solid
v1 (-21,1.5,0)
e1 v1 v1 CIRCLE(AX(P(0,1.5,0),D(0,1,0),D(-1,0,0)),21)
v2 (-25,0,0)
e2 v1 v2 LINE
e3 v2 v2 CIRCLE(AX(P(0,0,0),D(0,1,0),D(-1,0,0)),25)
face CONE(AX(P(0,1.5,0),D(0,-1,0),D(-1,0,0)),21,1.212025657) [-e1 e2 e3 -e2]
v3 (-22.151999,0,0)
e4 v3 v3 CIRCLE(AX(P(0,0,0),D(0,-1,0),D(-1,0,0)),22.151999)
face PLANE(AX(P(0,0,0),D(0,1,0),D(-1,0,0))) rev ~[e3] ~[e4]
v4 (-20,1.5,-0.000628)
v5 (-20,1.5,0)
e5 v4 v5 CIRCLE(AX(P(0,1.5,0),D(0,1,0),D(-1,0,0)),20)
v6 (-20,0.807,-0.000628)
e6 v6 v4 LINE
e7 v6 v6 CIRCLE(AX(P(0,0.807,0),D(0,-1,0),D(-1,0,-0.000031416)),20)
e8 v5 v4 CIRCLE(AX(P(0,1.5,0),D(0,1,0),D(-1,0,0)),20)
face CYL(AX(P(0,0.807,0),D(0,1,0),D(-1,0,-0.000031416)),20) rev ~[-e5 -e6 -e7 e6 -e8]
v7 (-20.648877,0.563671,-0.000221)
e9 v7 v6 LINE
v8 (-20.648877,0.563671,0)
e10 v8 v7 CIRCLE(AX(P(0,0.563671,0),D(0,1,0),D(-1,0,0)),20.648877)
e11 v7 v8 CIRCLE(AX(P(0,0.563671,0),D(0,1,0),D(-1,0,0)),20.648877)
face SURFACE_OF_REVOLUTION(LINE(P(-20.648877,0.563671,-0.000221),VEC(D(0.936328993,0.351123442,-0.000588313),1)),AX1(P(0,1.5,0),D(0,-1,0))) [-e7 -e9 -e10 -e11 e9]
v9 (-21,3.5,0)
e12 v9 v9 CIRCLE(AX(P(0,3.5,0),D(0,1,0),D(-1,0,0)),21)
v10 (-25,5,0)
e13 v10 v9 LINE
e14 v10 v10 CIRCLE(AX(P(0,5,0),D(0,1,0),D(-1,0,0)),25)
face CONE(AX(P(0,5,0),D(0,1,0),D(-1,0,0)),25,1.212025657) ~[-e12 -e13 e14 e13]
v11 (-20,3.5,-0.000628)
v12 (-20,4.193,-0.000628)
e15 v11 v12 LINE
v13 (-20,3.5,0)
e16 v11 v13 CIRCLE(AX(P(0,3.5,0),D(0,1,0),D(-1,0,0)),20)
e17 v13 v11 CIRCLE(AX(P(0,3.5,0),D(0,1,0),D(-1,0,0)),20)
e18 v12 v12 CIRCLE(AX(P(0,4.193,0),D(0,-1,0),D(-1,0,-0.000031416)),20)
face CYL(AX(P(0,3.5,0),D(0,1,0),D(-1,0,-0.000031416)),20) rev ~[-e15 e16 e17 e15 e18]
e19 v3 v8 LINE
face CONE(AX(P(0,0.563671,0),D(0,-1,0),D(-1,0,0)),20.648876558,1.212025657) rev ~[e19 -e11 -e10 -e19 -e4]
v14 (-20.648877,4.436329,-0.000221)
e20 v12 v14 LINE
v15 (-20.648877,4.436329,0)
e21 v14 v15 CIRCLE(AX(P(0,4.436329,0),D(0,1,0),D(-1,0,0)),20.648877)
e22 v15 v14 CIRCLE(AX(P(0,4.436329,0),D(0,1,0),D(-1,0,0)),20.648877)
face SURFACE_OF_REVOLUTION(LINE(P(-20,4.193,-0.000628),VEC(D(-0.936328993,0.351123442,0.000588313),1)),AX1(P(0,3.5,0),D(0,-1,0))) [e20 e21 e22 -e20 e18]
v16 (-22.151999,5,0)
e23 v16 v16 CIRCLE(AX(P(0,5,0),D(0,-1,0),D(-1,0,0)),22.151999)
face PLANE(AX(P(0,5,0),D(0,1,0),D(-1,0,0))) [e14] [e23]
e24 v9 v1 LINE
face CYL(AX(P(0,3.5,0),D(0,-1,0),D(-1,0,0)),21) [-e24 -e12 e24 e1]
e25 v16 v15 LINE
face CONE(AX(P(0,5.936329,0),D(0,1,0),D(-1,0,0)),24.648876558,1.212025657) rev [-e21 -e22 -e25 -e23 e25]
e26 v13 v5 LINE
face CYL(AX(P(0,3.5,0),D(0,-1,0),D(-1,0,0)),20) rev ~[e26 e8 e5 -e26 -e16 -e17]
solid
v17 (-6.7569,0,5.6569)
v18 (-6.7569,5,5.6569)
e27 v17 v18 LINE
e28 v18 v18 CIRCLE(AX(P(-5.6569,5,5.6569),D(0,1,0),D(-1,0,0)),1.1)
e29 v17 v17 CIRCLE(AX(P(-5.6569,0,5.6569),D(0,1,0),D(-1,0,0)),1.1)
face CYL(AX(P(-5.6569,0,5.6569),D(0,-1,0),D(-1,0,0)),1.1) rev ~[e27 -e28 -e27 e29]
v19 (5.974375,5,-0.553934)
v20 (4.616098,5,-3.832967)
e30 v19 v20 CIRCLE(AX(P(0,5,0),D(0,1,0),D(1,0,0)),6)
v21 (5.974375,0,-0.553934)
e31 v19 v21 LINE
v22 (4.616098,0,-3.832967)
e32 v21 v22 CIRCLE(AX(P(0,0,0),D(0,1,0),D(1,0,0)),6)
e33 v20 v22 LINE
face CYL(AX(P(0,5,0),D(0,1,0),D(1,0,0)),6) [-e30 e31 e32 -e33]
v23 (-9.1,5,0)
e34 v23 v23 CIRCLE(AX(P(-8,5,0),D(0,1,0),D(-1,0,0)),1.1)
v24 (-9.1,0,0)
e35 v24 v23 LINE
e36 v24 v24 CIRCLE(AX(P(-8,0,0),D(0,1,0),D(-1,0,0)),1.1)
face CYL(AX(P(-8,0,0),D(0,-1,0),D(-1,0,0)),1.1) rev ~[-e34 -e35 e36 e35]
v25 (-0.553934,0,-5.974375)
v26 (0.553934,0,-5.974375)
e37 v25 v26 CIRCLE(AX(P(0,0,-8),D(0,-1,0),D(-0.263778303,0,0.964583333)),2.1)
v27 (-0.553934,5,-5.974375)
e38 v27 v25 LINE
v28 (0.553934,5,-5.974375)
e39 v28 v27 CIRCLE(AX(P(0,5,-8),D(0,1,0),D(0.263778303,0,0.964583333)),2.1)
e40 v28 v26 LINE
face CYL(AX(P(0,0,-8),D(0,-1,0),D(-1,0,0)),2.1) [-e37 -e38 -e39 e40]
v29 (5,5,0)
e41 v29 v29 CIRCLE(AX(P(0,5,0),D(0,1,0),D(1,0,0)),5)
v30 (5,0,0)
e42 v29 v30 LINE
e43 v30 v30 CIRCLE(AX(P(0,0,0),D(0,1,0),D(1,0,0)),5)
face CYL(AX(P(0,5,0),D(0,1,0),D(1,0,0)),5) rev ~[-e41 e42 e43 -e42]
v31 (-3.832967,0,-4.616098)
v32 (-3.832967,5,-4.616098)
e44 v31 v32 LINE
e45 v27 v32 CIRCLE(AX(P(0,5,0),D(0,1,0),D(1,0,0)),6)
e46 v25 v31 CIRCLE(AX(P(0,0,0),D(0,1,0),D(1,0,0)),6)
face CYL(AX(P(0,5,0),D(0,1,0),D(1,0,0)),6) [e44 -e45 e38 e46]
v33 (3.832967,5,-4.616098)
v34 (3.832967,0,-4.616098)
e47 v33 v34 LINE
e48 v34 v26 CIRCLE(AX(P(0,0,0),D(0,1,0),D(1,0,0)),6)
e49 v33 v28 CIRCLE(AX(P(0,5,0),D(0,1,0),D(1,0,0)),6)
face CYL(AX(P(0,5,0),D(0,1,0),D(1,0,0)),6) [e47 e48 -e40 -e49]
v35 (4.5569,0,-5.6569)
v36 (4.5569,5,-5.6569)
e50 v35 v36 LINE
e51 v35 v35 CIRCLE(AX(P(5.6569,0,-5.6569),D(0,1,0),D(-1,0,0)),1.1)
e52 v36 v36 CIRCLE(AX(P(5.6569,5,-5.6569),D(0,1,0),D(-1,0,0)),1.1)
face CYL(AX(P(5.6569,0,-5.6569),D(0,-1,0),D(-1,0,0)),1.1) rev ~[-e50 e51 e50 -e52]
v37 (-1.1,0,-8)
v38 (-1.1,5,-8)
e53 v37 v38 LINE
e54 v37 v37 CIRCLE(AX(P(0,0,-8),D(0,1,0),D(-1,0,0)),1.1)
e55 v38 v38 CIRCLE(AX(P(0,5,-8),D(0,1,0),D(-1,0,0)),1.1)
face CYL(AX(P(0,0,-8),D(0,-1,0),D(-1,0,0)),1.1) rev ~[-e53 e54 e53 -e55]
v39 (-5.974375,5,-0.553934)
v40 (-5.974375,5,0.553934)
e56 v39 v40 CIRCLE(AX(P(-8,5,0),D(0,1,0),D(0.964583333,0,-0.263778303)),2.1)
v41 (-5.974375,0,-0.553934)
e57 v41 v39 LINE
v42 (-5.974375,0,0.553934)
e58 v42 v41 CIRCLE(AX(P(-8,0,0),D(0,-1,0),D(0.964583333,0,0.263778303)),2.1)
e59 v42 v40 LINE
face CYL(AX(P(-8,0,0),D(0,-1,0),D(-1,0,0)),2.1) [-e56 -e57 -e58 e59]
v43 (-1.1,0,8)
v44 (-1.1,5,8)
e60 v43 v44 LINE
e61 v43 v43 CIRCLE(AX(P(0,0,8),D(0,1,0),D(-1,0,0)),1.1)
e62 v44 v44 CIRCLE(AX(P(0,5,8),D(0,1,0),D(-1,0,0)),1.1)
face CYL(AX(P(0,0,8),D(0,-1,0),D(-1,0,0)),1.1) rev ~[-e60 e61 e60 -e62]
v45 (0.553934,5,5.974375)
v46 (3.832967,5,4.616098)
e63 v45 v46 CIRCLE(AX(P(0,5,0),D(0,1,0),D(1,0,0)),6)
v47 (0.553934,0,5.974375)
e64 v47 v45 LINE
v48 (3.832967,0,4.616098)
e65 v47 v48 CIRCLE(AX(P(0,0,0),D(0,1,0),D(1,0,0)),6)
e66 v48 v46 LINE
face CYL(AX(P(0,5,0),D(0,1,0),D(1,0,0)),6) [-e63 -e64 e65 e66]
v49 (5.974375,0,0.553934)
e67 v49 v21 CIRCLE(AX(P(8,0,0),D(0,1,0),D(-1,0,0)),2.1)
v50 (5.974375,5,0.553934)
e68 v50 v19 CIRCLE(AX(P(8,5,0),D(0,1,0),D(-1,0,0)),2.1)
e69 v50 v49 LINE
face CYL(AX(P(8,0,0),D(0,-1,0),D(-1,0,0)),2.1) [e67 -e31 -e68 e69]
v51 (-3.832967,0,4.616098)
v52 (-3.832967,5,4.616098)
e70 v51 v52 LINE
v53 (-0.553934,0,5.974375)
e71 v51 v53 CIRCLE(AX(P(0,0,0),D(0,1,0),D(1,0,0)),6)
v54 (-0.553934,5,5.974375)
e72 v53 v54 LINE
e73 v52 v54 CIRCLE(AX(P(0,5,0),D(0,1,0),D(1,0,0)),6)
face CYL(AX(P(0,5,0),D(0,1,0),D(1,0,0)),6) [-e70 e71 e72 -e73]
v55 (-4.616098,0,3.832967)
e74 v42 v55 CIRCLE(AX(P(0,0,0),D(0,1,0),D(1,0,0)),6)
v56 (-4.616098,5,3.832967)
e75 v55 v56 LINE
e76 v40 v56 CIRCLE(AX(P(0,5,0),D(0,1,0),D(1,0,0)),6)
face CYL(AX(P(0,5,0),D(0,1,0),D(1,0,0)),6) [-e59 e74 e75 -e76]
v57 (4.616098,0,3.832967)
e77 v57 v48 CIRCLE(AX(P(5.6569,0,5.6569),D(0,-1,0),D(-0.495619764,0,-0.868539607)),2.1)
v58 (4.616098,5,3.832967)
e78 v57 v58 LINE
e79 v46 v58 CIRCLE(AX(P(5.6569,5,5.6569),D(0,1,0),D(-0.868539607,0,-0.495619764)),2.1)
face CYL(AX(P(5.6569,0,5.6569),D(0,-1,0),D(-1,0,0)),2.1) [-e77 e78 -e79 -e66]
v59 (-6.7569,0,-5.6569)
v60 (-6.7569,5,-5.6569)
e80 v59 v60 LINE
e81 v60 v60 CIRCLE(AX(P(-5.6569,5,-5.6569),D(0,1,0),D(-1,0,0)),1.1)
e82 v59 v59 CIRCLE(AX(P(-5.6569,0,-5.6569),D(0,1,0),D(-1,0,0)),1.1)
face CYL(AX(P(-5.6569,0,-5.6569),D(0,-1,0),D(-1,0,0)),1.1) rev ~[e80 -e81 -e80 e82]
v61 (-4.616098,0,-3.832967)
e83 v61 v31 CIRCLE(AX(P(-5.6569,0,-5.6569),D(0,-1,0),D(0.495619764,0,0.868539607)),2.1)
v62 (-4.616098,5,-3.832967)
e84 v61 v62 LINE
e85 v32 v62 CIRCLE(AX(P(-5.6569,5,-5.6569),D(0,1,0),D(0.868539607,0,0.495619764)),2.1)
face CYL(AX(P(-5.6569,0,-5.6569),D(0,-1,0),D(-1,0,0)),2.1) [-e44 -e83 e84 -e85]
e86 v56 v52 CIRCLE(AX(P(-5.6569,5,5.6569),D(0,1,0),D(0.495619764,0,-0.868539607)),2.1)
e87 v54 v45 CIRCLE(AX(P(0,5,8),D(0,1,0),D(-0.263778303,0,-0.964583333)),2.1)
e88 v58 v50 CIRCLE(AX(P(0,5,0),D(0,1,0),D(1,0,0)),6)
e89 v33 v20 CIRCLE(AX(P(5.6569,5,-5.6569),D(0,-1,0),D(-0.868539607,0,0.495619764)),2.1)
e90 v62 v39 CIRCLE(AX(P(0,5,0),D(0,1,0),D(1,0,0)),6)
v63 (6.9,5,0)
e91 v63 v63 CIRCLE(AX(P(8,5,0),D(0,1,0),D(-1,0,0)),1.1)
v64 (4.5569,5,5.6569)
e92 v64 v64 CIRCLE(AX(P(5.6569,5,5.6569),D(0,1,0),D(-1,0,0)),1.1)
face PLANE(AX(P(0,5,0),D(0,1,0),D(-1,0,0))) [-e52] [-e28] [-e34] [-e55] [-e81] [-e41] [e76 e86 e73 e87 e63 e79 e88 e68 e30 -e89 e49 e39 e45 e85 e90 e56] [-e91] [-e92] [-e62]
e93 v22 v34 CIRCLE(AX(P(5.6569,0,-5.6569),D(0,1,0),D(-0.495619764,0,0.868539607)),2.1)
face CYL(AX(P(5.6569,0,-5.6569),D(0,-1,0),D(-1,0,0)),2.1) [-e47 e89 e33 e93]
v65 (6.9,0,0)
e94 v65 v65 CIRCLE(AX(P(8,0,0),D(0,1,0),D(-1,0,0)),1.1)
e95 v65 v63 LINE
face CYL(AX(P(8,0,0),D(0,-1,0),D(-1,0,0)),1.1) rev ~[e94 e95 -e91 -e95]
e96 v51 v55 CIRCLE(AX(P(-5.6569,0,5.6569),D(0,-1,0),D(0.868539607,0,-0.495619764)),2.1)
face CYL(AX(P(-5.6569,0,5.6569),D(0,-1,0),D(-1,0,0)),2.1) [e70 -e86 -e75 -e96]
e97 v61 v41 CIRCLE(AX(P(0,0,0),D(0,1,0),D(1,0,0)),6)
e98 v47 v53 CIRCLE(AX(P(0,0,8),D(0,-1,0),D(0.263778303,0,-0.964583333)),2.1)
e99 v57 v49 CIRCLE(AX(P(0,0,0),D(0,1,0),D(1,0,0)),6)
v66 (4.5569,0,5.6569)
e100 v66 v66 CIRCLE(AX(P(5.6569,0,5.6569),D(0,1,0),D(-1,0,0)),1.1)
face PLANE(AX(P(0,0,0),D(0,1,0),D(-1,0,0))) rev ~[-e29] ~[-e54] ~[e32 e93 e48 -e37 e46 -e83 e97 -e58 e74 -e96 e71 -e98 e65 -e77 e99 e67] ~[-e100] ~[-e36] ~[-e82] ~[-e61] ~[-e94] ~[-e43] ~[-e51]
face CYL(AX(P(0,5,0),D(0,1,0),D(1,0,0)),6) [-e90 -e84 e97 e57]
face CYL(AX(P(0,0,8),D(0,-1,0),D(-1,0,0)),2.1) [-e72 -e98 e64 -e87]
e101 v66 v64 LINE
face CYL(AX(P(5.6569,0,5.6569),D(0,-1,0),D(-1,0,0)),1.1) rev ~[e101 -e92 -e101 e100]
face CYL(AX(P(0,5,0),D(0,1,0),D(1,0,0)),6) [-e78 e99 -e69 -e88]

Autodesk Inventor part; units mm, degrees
ref_plane "YZ Plane" through (0, 0, 0) normal (1, 0, 0) x (0, 1, 0)
ref_plane "XZ Plane" through (0, 0, 0) normal (0, 1, 0) x (-1, 0, 0)
ref_plane "XY Plane" through (0, 0, 0) normal (0, 0, 1) x (1, 0, 0)
sketch "Sketch1" plane through (0, 0, 0) normal (0, 1, 0) x (-1, 0, 0)
  circle A0 centre (0, 0) radius 25
  circle A1 centre (0, 0) radius 8 construction
  circle A2 centre (0, -8) radius 1.1
  circle A3 centre (5.6569, -5.6569) radius 1.1
  circle A4 centre (8, 0) radius 1.1
  circle A5 centre (5.6569, 5.6569) radius 1.1
  circle A6 centre (0, 8) radius 1.1
  circle A7 centre (-5.6569, 5.6569) radius 1.1
  circle A8 centre (-8, 0) radius 1.1
  circle A9 centre (-5.6569, -5.6569) radius 1.1
  dimension "d1" = 16
  dimension "d0" = 50
  dimension "d2" = 2.2
  dimension "d6" = 360
extrude "Extrusion1" add sketch "Sketch1" along normal blind 5
sketch "Sketch2" plane through (0, 5, 0) normal (0, 1, 0) x (1, 0, 0)
  circle A0 centre (0, 0) radius 5
  dimension "d10" = 10
extrude "Extrusion2" cut sketch "Sketch2" against normal blind 5
sketch "Sketch3" plane through (0, 0, 0) normal (0, 0, 1) x (1, 0, 0)
  line L0 (25, 5) -> (-25, 5) projected
  line L1 (25, 0) -> (-25, 0) projected
  line L2 (-25, 5) -> (-21, 3.5)
  line L3 (-21, 3.5) -> (-21, 1.5)
  line L4 (-25, 0) -> (-25, 5) projected
  line L5 (25, 0) -> (-25, 0) projected
  line L6 (-21, 1.5) -> (-25, 0)
  line L7 (0, -1) -> (0, 6) projected
  point P0 (0, 0)
  point P1 (-21, 2.5)
  point P2 (-25, 2.5)
  dimension "d13" = 2
  dimension "d14" = 4
revolve "Revolution1" cut sketch "Sketch3" angle 360 about axis through (0, -10, 0) along (0, 1, 0) contours L2 L3 L6 L4
shell "Shell1" thickness 1 removed faces 2 at (-18.4111, 5, 6.1101) at (-18.4111, 0, 6.1101)
sketch "Sketch4" plane through (0, 5, 0) normal (0, 1, 0) x (1, 0, 0)
  circle A0 centre (0, 0) radius 10.1
  arc A1 (-5.9744, 0.5539) -> (-5.9744, -0.5539) centre (-8, 0) ccw construction
  point P0 (-10.1, 0)
properties part number "Spool1"
